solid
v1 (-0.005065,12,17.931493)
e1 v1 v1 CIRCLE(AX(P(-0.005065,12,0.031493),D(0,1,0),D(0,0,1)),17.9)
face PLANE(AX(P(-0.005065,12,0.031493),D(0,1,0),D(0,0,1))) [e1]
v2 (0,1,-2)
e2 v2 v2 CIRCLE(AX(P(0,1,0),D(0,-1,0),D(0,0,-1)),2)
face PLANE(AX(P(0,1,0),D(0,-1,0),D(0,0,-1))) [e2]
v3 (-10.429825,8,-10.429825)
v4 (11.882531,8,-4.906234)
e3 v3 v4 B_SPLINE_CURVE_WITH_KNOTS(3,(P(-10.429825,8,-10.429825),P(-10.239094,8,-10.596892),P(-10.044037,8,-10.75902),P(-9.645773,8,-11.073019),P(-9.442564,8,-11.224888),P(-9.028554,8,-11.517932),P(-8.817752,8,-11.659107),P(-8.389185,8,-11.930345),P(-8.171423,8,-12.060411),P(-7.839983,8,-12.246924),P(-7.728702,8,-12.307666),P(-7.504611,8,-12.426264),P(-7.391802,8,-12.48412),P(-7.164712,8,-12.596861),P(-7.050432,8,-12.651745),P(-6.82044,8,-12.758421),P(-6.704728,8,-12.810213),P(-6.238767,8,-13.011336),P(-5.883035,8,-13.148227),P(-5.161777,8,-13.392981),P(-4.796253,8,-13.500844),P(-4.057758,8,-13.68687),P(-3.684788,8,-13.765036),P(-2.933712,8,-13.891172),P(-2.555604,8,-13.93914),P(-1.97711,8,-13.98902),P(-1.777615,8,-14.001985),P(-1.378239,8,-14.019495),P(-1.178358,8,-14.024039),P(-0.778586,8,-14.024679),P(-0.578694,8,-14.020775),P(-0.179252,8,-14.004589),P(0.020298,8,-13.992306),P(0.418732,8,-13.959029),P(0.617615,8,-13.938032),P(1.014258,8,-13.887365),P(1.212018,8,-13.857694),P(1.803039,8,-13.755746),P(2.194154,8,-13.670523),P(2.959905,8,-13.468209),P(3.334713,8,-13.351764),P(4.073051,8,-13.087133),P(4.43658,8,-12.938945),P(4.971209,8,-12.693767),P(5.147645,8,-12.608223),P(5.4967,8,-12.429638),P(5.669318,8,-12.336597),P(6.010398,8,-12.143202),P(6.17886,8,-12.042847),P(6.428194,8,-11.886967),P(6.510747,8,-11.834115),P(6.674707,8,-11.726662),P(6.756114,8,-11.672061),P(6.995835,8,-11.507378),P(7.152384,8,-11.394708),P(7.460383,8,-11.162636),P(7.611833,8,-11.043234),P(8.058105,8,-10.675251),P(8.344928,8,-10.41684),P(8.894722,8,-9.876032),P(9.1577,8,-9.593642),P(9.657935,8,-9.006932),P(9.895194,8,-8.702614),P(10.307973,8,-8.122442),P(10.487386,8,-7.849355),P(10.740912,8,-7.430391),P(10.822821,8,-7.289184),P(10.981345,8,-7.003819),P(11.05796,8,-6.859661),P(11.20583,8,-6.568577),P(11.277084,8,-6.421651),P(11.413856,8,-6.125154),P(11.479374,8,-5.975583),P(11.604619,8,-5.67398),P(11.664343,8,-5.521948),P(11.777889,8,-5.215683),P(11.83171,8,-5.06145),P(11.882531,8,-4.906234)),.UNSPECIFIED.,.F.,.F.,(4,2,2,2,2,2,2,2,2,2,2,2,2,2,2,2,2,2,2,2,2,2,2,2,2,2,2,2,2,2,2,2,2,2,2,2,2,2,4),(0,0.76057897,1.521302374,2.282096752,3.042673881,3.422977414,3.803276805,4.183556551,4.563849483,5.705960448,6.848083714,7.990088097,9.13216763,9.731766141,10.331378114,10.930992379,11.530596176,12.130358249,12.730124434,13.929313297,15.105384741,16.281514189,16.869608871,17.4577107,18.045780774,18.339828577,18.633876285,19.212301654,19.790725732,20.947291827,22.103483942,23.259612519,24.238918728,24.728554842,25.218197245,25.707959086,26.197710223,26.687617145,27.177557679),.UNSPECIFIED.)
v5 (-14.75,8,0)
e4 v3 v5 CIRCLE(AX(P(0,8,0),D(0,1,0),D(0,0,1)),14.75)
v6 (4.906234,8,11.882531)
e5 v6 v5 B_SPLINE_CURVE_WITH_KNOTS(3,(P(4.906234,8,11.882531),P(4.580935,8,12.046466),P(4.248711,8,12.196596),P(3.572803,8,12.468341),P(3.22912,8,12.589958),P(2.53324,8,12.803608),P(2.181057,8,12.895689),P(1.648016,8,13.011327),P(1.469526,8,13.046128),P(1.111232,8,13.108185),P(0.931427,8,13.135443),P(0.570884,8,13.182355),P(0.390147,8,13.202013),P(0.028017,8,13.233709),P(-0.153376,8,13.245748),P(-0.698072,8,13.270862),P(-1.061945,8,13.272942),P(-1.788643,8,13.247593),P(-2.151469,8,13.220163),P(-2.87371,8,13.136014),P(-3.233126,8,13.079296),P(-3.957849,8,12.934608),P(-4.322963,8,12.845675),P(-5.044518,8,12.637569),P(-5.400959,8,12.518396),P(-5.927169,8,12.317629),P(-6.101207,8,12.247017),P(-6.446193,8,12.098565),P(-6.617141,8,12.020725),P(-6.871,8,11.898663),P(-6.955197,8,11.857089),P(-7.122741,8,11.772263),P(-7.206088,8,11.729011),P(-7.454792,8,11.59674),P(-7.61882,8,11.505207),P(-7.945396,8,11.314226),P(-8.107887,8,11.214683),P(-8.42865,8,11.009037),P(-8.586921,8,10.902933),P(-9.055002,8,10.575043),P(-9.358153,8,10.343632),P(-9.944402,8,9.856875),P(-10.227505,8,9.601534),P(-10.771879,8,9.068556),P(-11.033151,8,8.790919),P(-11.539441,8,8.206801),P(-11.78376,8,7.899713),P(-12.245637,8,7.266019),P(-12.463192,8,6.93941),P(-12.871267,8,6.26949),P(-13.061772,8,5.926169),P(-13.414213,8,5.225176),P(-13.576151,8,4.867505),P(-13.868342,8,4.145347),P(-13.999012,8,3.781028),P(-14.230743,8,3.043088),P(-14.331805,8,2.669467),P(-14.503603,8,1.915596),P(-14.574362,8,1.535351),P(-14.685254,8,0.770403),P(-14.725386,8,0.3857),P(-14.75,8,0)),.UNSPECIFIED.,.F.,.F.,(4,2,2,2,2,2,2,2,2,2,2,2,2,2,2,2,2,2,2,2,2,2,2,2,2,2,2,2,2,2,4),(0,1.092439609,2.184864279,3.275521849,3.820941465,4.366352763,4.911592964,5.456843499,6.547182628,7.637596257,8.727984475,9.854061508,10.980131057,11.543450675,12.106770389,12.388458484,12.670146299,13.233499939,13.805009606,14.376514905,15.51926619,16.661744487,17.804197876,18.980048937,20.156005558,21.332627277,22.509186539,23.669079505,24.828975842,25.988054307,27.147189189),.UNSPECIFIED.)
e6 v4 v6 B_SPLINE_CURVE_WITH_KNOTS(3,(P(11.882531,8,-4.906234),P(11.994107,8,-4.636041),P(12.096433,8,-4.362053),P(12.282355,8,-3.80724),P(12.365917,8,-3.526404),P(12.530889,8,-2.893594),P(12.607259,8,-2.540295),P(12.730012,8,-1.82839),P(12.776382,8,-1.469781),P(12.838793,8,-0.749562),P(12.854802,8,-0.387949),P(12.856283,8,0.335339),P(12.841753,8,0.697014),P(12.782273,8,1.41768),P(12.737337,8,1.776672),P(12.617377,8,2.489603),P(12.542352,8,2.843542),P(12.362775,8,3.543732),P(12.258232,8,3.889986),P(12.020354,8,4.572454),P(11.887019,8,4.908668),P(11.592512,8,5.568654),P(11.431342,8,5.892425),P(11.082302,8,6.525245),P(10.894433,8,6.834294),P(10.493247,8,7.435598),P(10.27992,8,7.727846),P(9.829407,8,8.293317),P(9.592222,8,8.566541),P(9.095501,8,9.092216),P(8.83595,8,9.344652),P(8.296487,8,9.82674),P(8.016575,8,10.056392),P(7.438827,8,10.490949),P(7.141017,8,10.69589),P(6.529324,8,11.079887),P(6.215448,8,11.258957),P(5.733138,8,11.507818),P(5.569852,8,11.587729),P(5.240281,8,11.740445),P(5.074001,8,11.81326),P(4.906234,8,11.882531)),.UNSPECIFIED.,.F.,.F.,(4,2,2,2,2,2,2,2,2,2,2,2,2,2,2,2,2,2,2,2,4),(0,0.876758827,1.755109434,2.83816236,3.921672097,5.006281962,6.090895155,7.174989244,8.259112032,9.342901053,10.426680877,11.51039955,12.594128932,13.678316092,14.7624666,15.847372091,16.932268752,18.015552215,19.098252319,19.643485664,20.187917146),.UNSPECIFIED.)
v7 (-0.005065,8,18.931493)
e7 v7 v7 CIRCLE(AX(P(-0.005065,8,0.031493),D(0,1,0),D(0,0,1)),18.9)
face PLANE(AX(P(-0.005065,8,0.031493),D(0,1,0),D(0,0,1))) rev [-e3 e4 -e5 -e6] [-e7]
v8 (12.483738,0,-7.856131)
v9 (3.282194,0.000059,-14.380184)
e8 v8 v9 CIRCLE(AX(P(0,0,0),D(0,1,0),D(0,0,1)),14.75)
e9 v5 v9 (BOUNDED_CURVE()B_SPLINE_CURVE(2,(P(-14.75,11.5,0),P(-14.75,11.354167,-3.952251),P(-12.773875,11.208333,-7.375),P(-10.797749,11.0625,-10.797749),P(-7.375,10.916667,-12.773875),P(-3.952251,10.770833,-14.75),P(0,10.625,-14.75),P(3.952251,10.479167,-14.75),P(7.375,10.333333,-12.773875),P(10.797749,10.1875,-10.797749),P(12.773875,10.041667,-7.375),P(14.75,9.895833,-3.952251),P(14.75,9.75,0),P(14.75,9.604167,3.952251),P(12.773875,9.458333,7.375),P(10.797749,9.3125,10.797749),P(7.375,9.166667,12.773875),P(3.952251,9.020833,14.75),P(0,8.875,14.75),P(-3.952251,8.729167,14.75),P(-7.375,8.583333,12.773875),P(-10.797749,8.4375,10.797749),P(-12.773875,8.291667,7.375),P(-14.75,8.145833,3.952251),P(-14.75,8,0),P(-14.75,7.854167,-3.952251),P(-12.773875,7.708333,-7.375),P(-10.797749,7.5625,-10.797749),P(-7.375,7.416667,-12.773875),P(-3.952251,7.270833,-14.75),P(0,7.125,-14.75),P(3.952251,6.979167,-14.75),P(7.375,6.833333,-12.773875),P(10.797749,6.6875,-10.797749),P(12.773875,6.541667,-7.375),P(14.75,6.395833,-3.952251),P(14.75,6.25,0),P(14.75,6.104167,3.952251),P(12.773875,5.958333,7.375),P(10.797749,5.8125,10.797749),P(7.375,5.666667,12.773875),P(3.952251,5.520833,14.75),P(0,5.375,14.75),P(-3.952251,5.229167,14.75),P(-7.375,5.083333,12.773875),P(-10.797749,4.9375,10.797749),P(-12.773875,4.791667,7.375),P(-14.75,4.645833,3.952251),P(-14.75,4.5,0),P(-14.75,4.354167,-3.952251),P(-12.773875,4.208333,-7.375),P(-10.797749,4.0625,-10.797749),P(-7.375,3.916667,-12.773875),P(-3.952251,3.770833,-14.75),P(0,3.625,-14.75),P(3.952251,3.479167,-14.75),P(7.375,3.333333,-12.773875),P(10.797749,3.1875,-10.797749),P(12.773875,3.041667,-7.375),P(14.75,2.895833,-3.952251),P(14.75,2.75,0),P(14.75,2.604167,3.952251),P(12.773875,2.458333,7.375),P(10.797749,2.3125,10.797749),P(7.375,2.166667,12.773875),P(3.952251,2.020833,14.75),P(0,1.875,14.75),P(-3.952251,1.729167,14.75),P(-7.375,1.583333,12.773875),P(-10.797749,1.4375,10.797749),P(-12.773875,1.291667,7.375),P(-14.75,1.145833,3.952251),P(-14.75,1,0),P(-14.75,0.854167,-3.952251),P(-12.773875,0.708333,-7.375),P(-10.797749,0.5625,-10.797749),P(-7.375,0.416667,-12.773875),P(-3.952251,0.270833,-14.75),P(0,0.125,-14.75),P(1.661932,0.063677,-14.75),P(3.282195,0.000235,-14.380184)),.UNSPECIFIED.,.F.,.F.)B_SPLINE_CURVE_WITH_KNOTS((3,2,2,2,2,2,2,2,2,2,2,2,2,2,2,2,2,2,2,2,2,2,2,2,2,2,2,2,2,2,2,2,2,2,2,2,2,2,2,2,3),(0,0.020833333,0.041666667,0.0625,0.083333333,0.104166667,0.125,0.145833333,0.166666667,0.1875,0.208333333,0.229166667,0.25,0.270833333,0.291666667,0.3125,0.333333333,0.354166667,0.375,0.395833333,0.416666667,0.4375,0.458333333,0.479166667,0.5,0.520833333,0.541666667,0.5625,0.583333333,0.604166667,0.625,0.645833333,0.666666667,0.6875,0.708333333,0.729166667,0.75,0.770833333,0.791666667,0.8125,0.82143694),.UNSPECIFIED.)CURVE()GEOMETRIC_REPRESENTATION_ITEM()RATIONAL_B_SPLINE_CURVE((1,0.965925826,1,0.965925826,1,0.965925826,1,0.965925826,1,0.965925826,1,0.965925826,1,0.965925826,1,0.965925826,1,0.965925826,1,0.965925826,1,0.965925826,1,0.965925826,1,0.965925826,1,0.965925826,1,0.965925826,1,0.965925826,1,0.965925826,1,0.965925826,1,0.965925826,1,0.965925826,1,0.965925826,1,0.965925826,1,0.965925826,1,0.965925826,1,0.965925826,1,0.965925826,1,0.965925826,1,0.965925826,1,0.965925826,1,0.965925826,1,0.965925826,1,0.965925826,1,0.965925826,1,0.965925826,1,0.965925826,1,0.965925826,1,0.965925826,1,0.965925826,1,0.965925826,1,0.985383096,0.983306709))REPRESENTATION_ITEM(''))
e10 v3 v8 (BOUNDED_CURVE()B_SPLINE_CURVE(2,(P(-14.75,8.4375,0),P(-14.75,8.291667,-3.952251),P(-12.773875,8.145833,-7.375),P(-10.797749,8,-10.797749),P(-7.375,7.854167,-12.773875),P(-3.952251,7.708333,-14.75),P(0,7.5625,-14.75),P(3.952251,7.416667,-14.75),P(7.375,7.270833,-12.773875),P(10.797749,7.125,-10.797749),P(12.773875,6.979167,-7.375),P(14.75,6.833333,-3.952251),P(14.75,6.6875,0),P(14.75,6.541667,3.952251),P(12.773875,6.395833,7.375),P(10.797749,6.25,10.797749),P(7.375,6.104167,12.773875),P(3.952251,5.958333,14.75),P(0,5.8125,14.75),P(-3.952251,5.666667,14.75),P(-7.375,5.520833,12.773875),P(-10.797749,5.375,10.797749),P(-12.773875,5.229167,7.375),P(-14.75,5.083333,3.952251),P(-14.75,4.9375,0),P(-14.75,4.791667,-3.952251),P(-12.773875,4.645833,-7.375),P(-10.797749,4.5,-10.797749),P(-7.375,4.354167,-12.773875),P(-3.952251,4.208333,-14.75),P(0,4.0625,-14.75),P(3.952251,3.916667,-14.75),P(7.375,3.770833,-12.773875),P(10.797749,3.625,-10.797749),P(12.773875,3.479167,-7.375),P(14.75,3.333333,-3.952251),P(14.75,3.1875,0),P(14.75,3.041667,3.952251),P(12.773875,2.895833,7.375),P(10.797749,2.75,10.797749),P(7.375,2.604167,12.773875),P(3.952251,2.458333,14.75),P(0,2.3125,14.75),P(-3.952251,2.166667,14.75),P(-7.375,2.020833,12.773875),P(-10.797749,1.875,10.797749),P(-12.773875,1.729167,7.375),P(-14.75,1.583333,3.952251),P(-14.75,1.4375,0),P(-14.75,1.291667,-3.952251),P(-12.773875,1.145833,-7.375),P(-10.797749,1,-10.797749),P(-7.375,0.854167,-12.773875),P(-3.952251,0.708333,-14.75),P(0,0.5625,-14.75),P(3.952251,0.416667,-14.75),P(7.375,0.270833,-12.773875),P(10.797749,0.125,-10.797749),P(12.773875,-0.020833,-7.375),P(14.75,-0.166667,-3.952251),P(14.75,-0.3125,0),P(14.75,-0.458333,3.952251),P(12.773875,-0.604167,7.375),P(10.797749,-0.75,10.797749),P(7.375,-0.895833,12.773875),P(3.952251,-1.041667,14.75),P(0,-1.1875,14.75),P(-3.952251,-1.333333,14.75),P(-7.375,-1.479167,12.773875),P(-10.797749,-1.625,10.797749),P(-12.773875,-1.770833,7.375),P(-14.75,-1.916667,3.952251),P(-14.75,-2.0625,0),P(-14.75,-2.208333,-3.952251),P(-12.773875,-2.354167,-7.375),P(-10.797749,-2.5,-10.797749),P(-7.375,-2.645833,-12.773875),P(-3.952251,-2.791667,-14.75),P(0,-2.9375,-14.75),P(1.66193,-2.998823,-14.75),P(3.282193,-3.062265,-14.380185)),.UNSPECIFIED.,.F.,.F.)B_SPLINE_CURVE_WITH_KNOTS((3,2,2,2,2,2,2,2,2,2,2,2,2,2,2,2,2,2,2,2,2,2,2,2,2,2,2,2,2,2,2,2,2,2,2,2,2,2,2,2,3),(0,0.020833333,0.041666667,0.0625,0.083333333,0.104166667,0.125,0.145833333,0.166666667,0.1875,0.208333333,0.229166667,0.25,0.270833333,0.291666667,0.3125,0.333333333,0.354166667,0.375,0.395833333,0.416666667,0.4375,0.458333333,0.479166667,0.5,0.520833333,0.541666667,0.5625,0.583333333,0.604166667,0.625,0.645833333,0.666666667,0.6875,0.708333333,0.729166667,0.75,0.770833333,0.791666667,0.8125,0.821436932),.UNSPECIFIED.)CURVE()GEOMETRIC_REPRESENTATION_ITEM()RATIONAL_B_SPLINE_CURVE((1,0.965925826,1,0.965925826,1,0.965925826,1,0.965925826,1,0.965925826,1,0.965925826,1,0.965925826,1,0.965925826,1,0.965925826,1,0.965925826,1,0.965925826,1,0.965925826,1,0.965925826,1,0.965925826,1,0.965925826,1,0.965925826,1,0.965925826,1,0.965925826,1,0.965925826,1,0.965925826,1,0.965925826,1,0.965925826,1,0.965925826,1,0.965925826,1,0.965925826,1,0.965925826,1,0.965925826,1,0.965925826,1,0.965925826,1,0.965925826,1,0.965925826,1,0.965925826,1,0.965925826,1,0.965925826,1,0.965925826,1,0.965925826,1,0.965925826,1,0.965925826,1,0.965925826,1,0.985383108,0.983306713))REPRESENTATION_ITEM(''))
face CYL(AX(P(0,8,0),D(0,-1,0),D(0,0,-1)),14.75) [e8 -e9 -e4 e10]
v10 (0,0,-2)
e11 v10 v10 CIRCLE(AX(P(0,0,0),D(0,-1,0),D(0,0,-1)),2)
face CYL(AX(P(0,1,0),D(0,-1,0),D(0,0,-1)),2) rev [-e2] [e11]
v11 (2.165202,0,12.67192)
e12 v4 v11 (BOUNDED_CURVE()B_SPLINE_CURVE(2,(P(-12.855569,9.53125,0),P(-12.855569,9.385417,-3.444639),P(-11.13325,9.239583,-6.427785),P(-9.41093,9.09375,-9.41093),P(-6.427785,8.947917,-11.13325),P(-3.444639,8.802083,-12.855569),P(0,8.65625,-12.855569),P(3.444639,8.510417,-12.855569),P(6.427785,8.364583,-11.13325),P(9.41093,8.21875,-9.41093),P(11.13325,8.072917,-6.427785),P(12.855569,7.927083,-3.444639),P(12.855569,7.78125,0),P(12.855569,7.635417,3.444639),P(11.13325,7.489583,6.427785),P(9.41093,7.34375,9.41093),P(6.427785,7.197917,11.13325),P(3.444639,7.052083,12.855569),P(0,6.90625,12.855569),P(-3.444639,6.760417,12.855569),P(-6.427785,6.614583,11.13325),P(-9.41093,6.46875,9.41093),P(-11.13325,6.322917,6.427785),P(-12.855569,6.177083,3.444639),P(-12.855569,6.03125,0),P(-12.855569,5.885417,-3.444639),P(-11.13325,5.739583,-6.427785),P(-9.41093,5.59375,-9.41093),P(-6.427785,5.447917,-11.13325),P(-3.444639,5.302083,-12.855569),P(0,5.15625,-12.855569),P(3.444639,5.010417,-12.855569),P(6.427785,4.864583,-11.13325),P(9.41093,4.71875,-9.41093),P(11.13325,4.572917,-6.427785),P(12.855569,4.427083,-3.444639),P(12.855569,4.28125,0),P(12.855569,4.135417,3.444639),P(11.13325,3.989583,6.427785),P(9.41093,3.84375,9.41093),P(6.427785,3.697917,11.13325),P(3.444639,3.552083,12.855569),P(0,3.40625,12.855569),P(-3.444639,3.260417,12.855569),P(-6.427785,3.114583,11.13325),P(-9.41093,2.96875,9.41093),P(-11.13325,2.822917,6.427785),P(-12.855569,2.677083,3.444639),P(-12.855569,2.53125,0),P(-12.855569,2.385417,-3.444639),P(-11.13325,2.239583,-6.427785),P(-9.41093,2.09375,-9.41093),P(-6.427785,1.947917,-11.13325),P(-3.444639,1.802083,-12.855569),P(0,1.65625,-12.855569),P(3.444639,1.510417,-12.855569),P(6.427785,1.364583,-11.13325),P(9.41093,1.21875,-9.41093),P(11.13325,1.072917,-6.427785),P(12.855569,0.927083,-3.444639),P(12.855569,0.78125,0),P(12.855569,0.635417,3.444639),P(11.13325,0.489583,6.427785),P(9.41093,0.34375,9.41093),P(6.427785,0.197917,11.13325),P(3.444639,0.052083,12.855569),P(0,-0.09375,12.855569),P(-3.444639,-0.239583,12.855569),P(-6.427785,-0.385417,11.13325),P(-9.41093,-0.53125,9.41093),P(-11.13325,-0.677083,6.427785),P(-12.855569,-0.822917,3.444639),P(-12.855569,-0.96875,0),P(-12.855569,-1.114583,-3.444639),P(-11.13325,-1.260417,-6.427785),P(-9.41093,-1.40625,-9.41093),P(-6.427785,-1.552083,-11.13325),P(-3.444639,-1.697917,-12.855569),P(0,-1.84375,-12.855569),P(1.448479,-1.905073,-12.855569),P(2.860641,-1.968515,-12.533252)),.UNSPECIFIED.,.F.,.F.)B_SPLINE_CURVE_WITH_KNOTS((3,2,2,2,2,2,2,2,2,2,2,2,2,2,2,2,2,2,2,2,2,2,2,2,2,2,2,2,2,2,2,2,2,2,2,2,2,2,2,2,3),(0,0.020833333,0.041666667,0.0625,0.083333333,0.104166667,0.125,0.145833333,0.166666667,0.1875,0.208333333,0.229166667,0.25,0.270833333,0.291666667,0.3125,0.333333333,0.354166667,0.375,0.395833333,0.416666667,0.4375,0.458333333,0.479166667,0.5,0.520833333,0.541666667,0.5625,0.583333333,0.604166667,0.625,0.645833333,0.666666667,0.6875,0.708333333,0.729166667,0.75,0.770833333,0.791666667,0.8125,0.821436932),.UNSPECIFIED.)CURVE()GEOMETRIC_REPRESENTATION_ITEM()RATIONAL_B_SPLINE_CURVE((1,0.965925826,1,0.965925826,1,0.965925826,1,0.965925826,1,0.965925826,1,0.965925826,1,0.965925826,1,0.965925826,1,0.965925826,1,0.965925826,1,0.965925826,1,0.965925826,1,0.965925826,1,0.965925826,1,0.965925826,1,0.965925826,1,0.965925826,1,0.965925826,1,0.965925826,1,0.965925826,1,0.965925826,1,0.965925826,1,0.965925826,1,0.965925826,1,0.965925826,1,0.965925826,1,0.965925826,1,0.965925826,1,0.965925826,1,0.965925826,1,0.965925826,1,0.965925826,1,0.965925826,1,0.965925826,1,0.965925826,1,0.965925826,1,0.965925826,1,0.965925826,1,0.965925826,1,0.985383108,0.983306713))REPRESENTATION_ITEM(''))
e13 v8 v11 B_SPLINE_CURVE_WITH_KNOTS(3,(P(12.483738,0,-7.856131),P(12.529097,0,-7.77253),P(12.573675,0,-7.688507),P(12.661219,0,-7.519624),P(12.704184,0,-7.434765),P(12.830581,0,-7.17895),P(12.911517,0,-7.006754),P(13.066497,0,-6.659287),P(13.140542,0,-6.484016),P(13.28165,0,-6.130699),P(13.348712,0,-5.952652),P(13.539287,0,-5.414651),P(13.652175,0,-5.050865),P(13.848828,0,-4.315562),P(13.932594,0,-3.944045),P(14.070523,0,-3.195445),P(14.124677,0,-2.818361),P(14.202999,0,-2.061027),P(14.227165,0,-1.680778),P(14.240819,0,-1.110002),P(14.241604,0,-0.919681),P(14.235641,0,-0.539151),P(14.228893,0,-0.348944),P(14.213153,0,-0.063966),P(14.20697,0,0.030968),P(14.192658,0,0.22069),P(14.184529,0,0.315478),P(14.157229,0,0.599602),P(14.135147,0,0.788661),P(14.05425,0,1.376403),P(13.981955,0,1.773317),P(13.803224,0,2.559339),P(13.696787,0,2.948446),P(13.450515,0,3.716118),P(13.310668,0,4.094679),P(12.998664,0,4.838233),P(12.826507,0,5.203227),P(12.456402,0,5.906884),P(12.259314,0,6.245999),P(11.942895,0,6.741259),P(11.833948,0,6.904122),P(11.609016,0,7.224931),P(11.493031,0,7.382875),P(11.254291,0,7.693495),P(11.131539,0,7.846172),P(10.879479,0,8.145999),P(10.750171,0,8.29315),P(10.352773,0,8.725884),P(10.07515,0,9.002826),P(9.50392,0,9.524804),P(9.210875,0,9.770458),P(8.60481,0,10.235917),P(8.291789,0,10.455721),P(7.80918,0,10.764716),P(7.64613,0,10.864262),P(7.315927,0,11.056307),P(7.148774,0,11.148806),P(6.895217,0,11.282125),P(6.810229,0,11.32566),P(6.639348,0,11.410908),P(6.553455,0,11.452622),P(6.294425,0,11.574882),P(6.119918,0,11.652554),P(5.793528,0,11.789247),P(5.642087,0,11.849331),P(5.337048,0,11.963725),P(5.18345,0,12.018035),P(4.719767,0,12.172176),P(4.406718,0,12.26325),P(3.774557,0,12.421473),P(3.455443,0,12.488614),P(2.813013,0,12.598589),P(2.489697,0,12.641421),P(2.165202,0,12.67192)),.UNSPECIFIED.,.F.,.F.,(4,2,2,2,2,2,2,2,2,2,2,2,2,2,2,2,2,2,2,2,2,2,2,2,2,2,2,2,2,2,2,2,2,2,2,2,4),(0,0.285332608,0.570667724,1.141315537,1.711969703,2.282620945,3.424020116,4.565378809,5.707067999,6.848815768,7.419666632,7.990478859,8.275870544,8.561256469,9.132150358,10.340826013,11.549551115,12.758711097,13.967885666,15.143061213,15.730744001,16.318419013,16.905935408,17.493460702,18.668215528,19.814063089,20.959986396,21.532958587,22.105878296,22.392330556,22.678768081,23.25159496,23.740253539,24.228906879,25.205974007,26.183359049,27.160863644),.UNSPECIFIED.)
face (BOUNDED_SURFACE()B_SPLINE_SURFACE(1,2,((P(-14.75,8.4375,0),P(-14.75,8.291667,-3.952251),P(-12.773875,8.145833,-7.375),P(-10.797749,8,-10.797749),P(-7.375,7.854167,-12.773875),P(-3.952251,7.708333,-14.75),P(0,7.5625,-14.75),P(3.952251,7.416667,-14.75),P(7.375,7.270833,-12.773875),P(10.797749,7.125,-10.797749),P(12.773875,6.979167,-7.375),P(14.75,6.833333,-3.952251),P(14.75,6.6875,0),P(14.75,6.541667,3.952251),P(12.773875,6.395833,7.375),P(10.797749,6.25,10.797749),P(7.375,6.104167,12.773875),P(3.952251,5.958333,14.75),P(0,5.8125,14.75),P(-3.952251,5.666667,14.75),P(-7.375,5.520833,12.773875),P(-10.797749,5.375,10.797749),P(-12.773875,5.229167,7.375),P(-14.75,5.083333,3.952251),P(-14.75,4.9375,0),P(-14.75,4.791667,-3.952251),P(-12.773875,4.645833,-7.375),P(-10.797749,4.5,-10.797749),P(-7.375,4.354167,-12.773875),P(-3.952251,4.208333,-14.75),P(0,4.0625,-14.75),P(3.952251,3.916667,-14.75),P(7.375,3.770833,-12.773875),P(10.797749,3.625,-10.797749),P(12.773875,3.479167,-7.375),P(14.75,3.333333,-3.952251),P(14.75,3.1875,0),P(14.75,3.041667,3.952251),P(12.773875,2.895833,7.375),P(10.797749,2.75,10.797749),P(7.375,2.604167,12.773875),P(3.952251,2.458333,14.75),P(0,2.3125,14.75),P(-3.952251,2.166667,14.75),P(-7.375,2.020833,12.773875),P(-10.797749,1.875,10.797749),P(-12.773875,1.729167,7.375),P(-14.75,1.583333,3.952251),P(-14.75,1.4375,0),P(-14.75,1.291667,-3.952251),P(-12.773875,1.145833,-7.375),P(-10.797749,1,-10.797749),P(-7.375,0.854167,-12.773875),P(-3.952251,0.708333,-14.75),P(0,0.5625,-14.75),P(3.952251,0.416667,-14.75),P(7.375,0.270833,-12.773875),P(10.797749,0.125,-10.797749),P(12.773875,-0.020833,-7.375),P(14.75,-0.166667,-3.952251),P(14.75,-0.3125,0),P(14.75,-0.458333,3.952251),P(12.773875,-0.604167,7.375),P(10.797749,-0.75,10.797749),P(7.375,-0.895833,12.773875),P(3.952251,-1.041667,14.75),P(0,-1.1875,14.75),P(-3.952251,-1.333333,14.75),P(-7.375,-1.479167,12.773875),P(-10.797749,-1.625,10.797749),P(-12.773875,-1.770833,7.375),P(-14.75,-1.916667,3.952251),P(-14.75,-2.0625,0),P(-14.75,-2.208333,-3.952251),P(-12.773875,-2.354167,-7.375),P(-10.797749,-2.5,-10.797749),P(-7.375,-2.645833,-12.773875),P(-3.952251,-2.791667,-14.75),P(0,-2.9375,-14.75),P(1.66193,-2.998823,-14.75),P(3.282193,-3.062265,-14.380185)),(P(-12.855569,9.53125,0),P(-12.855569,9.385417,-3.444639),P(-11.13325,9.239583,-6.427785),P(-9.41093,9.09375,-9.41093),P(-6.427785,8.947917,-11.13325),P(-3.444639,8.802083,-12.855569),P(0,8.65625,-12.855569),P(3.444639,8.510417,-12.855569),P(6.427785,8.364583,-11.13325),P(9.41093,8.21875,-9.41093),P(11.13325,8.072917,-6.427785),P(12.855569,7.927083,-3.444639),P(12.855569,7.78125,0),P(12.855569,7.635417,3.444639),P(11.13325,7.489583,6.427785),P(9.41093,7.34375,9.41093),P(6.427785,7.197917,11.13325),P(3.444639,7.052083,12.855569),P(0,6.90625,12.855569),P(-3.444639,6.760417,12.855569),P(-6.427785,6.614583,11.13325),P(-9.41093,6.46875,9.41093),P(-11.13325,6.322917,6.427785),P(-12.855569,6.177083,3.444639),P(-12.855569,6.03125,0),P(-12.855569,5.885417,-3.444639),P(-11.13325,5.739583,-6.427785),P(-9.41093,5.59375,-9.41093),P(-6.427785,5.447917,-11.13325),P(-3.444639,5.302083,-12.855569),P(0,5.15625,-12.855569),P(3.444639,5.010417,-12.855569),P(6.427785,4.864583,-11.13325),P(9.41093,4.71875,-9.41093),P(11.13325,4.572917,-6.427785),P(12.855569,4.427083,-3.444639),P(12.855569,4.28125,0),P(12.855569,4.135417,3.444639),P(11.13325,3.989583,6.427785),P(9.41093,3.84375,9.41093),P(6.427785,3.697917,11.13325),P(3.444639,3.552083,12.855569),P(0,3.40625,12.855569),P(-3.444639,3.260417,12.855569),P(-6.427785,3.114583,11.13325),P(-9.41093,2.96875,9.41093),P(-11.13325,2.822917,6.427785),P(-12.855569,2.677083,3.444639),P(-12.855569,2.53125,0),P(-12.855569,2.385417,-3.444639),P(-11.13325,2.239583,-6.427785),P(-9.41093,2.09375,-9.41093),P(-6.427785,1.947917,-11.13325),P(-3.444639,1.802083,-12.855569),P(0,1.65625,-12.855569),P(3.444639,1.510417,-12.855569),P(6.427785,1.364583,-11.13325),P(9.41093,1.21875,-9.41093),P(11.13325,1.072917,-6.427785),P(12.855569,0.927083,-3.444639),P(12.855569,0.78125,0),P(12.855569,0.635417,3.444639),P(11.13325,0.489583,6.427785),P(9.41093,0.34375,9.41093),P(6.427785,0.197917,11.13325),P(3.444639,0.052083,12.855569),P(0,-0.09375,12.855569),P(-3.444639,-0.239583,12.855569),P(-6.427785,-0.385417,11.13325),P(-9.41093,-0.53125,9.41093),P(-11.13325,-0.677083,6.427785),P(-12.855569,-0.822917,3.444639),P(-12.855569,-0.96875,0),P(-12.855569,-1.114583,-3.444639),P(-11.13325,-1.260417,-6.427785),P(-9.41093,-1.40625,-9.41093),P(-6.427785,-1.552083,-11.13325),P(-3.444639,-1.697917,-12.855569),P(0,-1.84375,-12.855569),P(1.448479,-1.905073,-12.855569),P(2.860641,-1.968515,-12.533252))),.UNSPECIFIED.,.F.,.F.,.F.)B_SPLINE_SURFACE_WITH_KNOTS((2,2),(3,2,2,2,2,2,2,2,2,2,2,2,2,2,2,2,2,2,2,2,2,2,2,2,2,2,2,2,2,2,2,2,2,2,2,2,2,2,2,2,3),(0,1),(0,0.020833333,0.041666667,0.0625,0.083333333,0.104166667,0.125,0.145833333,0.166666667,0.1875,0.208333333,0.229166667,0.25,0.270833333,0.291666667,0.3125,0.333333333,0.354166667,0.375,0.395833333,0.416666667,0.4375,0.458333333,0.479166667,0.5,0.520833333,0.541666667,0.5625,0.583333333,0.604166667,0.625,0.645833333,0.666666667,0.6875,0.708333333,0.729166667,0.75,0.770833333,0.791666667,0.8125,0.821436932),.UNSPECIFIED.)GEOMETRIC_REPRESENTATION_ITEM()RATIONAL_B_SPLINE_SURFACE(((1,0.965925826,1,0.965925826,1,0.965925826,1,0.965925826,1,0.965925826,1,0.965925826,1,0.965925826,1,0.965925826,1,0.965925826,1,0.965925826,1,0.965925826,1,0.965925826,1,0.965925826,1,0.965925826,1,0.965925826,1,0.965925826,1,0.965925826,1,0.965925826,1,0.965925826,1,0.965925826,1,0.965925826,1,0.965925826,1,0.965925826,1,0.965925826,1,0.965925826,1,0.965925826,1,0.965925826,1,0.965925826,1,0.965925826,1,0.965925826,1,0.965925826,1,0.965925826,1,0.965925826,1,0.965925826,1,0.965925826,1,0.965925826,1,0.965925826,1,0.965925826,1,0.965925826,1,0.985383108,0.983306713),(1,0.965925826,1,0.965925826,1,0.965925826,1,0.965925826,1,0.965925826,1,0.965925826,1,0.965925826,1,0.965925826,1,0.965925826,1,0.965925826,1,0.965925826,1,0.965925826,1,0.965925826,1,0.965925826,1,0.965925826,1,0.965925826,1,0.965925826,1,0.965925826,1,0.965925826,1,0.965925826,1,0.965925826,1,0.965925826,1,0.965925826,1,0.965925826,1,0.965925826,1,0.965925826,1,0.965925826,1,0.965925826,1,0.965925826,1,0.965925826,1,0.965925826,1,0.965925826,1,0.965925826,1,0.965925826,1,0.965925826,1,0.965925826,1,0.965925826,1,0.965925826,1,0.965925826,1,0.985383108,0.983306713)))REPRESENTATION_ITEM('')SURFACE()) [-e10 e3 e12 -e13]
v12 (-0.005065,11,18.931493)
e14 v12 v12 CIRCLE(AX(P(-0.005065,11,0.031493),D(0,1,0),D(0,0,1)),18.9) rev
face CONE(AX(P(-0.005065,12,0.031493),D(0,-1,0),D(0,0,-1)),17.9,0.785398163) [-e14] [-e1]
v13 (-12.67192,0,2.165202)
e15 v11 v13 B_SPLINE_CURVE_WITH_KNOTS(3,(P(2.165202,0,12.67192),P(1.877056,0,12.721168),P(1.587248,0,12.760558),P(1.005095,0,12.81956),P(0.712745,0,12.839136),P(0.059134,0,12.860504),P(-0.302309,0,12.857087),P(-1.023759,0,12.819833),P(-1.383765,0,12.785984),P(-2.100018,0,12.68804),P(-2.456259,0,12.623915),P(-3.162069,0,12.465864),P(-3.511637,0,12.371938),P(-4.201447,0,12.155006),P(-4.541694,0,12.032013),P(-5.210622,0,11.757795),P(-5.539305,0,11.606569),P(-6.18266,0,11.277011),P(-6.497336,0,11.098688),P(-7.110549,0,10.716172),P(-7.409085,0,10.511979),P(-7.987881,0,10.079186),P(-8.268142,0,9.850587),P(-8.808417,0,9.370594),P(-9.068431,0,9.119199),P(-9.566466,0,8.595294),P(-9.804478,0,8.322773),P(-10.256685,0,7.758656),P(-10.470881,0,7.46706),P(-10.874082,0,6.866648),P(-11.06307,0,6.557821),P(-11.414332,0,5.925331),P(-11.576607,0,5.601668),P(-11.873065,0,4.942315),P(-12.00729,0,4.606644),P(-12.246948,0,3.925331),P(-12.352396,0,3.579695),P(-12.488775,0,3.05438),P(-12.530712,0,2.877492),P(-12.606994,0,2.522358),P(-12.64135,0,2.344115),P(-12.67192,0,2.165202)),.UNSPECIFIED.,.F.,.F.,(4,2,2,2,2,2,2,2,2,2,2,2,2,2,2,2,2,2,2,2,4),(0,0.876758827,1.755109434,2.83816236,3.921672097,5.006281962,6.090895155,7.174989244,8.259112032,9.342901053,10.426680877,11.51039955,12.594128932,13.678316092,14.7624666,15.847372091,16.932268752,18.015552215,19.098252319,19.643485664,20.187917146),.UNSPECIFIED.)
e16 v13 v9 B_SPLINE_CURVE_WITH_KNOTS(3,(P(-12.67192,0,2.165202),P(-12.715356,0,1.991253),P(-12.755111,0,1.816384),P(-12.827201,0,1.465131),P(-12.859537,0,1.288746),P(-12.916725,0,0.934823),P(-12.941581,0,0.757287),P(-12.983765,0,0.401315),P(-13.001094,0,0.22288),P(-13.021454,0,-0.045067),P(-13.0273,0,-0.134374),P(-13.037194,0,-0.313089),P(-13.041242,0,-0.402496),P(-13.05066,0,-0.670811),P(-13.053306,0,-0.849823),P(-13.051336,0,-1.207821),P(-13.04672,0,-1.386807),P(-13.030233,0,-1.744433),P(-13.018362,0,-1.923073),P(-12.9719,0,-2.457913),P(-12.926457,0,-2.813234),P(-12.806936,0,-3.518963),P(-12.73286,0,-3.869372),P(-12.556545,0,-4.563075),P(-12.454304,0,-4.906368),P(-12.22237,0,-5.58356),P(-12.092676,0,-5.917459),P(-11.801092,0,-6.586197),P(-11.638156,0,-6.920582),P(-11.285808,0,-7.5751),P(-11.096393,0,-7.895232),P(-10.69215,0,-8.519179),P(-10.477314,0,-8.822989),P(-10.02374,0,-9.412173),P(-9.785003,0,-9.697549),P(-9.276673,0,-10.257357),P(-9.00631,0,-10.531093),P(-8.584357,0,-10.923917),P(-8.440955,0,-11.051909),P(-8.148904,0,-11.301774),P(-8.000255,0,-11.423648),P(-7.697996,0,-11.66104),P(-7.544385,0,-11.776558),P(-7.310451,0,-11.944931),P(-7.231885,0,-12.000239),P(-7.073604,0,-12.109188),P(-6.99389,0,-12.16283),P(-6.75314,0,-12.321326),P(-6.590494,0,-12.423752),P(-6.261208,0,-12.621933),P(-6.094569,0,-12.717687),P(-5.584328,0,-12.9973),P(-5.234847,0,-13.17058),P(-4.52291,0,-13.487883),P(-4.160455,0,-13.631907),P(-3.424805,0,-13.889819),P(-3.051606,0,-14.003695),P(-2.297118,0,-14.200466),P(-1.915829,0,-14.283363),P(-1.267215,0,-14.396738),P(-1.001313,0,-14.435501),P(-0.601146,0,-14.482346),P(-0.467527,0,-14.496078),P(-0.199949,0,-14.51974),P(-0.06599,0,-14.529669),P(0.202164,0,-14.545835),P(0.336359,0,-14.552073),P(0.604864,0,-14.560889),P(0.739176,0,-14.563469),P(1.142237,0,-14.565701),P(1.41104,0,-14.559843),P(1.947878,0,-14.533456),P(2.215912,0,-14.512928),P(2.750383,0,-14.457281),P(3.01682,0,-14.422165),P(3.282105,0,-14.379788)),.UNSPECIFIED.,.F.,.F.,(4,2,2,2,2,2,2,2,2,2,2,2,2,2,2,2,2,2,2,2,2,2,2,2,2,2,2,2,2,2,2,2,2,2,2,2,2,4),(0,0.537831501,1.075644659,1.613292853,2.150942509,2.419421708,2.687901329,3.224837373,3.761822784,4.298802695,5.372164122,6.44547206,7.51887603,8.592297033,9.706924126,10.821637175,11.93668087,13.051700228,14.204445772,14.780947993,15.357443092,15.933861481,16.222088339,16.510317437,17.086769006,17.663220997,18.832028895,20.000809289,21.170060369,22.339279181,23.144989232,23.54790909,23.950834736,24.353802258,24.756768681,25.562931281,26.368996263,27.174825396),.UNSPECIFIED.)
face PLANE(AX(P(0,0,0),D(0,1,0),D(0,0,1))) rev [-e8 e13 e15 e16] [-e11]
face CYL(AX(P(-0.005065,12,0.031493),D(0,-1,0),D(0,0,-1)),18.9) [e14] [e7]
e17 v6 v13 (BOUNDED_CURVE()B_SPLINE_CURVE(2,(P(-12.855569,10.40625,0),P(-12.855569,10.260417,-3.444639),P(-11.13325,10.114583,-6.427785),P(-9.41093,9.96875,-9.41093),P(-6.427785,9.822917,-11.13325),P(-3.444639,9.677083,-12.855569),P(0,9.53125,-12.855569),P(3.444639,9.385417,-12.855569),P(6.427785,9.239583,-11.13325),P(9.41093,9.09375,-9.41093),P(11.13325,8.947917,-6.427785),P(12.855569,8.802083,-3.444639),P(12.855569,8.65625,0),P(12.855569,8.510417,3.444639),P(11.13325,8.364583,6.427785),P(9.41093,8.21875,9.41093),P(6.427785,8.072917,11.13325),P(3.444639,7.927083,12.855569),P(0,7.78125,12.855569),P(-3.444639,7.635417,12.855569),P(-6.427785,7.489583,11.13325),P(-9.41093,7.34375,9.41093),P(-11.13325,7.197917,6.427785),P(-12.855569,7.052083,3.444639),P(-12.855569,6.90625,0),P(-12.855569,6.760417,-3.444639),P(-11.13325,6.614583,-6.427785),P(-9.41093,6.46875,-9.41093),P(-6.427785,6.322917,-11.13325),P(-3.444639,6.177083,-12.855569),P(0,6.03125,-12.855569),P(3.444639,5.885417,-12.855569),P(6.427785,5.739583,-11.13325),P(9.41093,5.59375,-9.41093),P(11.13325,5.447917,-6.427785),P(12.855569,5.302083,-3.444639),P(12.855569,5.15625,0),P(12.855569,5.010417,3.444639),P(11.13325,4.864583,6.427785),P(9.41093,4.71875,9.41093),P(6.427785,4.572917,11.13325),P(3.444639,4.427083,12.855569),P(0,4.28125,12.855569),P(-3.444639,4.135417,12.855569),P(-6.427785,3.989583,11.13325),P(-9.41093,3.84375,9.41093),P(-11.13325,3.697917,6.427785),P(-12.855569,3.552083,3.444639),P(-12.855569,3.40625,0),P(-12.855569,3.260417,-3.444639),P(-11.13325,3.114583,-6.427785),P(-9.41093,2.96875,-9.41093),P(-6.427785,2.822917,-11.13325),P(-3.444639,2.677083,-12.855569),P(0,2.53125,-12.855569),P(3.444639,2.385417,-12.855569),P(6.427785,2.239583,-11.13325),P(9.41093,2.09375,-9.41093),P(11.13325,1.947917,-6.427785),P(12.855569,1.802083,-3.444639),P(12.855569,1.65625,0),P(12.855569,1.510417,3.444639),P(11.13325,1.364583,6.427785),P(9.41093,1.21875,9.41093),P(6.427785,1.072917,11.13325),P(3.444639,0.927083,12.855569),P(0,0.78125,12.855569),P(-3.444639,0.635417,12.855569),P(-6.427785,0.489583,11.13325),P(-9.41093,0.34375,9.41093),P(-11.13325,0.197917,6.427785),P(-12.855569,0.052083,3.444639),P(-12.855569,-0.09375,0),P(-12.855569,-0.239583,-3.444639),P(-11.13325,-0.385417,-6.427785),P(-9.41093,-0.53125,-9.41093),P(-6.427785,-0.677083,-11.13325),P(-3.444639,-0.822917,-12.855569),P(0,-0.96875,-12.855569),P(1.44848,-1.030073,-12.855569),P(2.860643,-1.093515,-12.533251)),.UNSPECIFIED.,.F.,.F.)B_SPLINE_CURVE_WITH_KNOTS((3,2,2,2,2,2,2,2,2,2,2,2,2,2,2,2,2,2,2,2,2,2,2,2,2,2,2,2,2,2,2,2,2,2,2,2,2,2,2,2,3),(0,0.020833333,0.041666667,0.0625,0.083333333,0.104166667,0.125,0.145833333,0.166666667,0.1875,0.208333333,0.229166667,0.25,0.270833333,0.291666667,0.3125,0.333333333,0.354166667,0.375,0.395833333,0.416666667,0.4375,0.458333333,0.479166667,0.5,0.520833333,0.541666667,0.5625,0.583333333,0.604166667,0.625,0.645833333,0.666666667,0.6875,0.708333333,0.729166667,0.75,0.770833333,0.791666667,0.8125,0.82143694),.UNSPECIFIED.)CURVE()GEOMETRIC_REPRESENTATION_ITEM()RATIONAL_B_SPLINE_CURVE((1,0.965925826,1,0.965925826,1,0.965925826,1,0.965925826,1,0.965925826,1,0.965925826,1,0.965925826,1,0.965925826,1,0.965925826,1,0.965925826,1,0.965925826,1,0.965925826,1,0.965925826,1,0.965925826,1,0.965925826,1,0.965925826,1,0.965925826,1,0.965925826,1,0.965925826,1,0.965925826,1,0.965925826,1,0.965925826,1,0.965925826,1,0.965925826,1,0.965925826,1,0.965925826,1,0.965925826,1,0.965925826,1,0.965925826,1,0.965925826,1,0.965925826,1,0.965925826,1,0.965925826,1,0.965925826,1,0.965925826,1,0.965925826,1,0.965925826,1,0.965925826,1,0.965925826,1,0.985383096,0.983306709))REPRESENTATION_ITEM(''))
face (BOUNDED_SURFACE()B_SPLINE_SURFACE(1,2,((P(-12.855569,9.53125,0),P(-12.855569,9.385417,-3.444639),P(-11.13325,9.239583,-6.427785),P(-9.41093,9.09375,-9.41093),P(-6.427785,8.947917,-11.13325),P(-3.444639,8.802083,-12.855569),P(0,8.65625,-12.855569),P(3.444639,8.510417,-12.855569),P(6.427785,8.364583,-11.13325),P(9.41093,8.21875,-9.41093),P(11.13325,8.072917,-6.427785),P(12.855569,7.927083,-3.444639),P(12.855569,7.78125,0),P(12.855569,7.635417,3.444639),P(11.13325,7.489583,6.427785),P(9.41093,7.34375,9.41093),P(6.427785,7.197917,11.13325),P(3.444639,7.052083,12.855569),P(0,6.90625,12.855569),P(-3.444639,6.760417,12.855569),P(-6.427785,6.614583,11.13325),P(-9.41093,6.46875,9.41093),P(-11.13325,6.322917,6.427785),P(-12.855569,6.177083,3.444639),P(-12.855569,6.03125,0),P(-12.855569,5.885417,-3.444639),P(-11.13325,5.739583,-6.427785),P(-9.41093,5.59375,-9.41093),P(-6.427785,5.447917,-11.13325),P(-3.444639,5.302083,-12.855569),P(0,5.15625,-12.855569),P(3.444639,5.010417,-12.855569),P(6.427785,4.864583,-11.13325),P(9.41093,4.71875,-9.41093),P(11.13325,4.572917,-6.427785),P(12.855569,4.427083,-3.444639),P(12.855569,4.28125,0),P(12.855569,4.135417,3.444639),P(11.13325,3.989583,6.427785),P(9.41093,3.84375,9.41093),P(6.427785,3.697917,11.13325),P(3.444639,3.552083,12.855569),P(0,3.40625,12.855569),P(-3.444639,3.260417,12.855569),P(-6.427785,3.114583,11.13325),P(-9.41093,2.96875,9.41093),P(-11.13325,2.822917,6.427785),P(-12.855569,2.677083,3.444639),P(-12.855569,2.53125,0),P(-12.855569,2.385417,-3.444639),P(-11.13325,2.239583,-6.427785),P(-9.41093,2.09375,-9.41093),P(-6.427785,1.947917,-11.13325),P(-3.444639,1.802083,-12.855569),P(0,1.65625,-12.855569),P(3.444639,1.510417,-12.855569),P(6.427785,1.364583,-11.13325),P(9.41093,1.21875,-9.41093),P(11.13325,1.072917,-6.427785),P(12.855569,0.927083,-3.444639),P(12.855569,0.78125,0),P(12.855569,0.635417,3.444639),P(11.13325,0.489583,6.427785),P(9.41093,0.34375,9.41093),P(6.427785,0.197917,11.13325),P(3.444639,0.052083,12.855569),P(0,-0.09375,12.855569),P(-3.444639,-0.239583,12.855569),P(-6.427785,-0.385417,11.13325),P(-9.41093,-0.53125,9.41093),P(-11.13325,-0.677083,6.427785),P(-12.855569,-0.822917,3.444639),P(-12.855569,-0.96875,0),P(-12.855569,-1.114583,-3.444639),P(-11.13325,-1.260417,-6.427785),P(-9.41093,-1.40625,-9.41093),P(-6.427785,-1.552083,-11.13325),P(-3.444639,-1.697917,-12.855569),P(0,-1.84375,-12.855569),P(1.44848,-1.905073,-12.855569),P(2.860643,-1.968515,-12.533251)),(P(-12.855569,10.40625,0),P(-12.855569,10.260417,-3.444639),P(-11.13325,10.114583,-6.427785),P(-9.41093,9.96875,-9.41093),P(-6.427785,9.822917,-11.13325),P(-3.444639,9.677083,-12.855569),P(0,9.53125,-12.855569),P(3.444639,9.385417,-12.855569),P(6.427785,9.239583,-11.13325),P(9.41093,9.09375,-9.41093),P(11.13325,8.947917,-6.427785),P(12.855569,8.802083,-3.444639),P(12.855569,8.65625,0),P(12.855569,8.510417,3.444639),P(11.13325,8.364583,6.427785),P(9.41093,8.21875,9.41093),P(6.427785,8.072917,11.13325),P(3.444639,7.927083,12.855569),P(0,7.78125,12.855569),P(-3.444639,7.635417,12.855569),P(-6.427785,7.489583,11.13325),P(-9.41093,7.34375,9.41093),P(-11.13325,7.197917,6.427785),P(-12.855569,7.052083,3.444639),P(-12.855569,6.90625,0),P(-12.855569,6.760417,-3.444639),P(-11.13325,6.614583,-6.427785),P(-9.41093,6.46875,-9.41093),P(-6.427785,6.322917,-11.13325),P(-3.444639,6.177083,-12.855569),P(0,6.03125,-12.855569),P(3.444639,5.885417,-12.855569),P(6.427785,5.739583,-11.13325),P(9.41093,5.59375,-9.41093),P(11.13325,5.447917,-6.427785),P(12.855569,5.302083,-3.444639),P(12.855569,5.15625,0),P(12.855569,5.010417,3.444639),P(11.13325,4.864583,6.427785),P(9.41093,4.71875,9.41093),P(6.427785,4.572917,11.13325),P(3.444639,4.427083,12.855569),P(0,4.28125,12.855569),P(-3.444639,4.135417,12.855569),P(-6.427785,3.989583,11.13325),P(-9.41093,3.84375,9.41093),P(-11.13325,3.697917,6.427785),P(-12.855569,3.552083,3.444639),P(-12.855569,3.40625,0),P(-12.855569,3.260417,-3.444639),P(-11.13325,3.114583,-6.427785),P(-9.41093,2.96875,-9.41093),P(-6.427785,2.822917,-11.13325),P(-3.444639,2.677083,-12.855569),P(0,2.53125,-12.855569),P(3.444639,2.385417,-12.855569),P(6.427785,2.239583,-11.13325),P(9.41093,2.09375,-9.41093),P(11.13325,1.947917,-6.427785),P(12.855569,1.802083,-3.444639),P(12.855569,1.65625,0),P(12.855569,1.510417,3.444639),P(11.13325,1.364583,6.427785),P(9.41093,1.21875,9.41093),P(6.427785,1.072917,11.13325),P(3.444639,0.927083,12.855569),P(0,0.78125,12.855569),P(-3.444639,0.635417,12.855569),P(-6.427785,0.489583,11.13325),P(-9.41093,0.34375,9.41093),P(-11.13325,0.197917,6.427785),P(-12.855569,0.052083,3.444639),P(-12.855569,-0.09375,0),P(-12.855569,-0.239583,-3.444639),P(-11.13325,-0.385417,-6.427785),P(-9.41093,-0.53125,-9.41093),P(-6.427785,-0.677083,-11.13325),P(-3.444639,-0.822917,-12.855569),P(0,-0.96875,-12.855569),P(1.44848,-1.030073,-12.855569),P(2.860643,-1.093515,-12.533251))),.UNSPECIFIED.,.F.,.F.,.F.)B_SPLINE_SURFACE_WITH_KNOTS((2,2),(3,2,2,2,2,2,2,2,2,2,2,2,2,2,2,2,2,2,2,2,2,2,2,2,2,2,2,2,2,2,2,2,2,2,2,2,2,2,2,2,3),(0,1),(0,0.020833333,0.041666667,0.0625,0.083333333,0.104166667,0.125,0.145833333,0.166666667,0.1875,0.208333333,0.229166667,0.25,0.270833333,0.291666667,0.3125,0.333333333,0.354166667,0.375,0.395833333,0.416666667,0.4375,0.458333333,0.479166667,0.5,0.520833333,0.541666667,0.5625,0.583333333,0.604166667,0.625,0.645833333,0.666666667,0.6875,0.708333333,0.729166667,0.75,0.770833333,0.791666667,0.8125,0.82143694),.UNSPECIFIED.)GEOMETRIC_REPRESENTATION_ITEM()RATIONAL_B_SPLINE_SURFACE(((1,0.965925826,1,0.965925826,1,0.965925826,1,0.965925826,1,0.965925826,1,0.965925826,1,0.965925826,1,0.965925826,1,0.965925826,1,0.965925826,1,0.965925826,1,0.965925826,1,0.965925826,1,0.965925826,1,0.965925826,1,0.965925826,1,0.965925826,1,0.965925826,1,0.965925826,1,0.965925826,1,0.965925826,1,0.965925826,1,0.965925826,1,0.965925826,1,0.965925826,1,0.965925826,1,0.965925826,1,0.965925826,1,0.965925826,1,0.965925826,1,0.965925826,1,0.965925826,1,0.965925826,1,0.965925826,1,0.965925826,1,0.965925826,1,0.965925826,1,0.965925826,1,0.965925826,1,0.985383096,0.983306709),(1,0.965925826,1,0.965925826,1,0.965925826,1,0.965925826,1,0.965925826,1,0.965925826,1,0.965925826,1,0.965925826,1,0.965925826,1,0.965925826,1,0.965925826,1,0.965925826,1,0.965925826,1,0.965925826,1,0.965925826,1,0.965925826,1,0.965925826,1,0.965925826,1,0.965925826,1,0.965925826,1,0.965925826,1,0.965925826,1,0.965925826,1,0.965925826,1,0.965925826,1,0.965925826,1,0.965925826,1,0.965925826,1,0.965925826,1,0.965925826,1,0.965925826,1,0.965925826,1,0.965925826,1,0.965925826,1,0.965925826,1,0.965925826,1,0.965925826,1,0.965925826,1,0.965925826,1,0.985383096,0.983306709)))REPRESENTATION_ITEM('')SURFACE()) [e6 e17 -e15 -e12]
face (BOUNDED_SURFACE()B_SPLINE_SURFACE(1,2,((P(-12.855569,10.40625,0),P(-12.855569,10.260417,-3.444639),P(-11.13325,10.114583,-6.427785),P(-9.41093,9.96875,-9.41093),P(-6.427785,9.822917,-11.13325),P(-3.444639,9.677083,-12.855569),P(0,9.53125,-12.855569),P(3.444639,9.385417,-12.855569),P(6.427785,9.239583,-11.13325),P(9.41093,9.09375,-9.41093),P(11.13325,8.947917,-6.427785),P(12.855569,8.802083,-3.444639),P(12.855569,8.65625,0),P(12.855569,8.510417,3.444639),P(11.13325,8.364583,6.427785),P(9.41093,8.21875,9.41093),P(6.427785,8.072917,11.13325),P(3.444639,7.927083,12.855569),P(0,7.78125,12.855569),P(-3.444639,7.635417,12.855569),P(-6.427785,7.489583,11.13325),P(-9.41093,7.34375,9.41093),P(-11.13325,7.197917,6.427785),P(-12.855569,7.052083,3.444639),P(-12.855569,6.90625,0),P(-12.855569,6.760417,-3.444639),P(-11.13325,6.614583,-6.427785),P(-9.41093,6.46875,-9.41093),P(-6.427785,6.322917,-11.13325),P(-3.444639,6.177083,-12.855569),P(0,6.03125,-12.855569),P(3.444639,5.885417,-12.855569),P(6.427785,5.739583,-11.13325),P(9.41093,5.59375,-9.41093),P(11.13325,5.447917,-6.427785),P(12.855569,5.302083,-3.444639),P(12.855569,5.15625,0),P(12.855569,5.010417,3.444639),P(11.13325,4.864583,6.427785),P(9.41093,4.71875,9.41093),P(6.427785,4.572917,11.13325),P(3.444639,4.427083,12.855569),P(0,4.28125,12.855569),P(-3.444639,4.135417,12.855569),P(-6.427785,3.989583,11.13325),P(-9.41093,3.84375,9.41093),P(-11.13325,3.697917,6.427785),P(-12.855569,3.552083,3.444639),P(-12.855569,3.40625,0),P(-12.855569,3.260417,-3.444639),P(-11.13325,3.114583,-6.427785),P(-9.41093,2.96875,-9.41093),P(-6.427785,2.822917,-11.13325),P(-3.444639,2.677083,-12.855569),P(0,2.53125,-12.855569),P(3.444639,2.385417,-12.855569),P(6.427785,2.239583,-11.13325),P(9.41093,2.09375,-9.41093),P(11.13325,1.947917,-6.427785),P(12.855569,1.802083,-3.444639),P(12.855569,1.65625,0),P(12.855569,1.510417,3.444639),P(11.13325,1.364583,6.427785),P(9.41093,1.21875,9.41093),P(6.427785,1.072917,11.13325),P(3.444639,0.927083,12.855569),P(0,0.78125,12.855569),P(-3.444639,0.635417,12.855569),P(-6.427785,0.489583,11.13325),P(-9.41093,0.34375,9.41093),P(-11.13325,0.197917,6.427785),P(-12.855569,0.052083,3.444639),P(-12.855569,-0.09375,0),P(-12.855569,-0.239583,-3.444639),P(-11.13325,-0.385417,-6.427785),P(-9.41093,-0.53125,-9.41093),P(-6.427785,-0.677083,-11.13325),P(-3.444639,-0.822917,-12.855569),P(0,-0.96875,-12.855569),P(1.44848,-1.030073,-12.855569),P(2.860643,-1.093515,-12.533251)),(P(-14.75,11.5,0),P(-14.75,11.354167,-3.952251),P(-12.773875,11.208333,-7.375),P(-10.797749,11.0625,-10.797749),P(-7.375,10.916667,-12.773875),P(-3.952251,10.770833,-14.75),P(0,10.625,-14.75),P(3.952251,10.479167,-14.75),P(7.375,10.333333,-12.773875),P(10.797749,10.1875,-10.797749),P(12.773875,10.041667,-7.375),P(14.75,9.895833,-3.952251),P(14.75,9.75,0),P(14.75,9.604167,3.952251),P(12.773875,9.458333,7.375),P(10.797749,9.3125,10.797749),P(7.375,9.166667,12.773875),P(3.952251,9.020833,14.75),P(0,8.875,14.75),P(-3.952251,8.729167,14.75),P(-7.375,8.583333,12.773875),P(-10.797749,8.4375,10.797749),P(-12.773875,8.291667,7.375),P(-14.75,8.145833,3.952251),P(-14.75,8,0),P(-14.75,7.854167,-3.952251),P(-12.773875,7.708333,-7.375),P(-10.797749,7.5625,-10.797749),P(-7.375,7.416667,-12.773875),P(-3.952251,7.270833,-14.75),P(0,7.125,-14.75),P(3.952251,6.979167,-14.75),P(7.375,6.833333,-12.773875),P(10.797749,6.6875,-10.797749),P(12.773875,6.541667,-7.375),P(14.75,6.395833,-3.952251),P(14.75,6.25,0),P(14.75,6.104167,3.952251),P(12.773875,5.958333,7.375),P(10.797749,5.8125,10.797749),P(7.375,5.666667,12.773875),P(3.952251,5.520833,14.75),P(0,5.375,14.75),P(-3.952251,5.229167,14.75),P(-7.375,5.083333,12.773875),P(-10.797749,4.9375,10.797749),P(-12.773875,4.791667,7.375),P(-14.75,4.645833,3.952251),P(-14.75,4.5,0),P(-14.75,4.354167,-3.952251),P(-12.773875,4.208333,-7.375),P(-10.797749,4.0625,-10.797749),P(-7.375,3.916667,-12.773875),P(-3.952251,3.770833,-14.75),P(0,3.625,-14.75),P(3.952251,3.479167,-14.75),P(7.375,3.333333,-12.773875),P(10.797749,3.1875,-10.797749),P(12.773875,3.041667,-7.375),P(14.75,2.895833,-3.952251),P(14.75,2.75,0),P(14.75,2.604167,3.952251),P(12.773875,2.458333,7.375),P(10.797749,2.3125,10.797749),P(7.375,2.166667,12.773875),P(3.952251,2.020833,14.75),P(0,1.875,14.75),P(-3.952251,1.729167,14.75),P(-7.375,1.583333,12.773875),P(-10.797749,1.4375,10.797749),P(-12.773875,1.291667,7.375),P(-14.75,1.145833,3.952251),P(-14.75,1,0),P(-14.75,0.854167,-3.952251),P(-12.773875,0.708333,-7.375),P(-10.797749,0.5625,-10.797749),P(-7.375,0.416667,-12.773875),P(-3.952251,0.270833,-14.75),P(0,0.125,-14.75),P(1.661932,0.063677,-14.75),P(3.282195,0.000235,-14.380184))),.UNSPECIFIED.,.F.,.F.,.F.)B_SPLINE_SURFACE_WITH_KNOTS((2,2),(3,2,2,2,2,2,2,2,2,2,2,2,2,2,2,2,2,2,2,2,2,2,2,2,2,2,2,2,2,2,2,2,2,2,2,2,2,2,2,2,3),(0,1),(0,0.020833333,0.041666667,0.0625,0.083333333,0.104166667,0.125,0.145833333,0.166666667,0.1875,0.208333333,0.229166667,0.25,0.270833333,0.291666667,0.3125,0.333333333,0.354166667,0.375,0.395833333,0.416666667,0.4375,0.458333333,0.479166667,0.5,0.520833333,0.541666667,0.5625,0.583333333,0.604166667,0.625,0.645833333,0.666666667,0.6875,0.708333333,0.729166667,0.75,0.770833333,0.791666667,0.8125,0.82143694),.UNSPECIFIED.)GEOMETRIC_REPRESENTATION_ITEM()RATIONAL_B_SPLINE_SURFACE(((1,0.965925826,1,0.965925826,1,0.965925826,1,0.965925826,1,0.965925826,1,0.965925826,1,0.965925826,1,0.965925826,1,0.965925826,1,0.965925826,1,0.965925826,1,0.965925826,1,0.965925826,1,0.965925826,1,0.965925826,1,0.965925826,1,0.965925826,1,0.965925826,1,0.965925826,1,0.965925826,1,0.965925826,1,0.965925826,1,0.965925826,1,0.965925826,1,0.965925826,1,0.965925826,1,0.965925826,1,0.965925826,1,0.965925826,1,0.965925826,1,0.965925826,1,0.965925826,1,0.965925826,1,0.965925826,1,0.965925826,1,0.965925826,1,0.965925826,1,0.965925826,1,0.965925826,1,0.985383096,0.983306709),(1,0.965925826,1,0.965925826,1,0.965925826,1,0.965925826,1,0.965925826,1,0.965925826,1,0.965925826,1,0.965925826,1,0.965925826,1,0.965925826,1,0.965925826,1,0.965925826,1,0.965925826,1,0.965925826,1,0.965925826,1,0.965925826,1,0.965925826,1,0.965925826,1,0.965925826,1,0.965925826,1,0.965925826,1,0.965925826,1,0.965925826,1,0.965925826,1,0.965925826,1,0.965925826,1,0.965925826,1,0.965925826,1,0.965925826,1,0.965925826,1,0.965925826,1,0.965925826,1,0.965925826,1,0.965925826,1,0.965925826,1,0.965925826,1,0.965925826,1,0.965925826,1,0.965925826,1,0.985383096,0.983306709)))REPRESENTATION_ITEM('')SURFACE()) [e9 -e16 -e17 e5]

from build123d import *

# Parameters (mm, degrees)
SKETCH1_R           = 14.75
BOSS_EXTRUDE1_DEPTH = 8
SKETCH2_R           = 18.9
BOSS_EXTRUDE2_DEPTH = 4
THREAD1_PITCH       = 3.5
THREAD1_FROM        = 3.5
CHAMFER2_SIZE       = 1
SKETCH3_R           = 2
CUT_EXTRUDE1_DEPTH  = 1


with BuildPart() as part:
    # Sketch1 → Boss-Extrude1 (new body)
    with BuildSketch(Plane(origin=(0, 0, 0), x_dir=(1, 0, 0), z_dir=(0, 1, 0))):
        with Locations(Location((0, 0, 0), (0, 0, 270))):
            Circle(SKETCH1_R)
    extrude(amount=BOSS_EXTRUDE1_DEPTH)

    # Sketch2 → Boss-Extrude2 (add)
    with BuildSketch(Plane(origin=(0, 8, 0), x_dir=(1, 0, 0), z_dir=(0, 1, 0))):
        with Locations(Location((-0.005064595, -0.031492848, 0), (0, 0, 270))):
            Circle(SKETCH2_R)
    extrude(amount=BOSS_EXTRUDE2_DEPTH)

    # Thread1: arcs per turn and ends read off the stored shape
    # Thread1: the profile of Thread Profile1 profile screwed along a right-hand helix through 3.285714 turns, 12 arcs to a turn; built about Z, then put on its axis
    thread1_z = Axis((0, 0, 0), (0, 0, 1))
    thread1_corners = [(14.7503, 0, -0.000173205), (14.7503, 0, 3.062673196), (12.855569438, 0, 1.968749995), (12.855569438, 0, 1.093749995)]
    with BuildLine(mode=Mode.PRIVATE) as thread1_profile:
        Line(thread1_corners[0], thread1_corners[1])
        Line(thread1_corners[1], thread1_corners[2])
        Line(thread1_corners[2], thread1_corners[3])
        Line(thread1_corners[3], thread1_corners[0])
    thread1_cap = Face(thread1_profile.wire())
    thread1_turn_angles = [0, 15, 30, 45, 60, 75, 90, 105, 120, 135, 150, 165, 180, 195, 210, 225, 240, 255, 270, 285, 300, 315, 330, 345, 360]
    thread1_turn_weights = [1, 0.9659258262890683, 1, 0.9659258262890683, 1, 0.9659258262890683, 1, 0.9659258262890683, 1, 0.9659258262890683, 1, 0.9659258262890683, 1, 0.9659258262890683, 1, 0.9659258262890683, 1, 0.9659258262890683, 1, 0.9659258262890683, 1, 0.9659258262890683, 1, 0.9659258262890683, 1]
    thread1_turn_rails = [Edge.make_bspline([Vector(p[0], p[1], 0).rotate(thread1_z, thread1_turn_angles[k]) / thread1_turn_weights[k] + Vector(0, 0, p[2] + THREAD1_PITCH * thread1_turn_angles[k] / 360) for k in range(25)], [0, 0, 0, 1, 1, 2, 2, 3, 3, 4, 4, 5, 5, 6, 6, 7, 7, 8, 8, 9, 9, 10, 10, 11, 11, 12, 12, 12], 2, thread1_turn_weights) for p in thread1_corners]
    thread1_turn_sides = [Face.make_surface_from_curves(thread1_turn_rails[p[0]], thread1_turn_rails[p[1]]) for p in [(0, 1), (1, 2), (2, 3), (3, 0)]]
    thread1_last_angles = [1080, 1095, 1110, 1125, 1140, 1155, 1170, 1176.428571429, 1182.857142857]
    thread1_last_weights = [1, 0.9659258262890683, 1, 0.9659258262890683, 1, 0.9659258262890683, 1, 0.9937122098932428, 1]
    thread1_last_rails = [Edge.make_bspline([Vector(p[0], p[1], 0).rotate(thread1_z, thread1_last_angles[k]) / thread1_last_weights[k] + Vector(0, 0, p[2] + THREAD1_PITCH * thread1_last_angles[k] / 360) for k in range(9)], [0, 0, 0, 1, 1, 2, 2, 3, 3, 4, 4, 4], 2, thread1_last_weights) for p in thread1_corners]
    thread1_last_sides = [Face.make_surface_from_curves(thread1_last_rails[p[0]], thread1_last_rails[p[1]]) for p in [(0, 1), (1, 2), (2, 3), (3, 0)]]
    thread1 = Plane(origin=(0, 11.5, 0), x_dir=(-1, 0, 0), z_dir=(0, -1, 0)) * split(Solid(Shell([*[p.moved(Location((0, 0, THREAD1_PITCH * i))) for i in range(3) for p in thread1_turn_sides], *thread1_last_sides, thread1_cap, thread1_cap.rotate(thread1_z, 1182.857142857).moved(Location((0, 0, THREAD1_PITCH * 1182.857142857 / 360)))])), bisect_by=Plane.XY.offset(THREAD1_FROM), keep=Keep.TOP, mode=Mode.PRIVATE)
    add(thread1, mode=Mode.SUBTRACT)

    # Chamfer2
    chamfer2_edges = [part.edges().sort_by_distance(p)[0] for p in [
        (-0.005064595, 12, -18.868507152),
    ]]
    chamfer(chamfer2_edges, length=CHAMFER2_SIZE)

    # Sketch3 → Cut-Extrude1 (cut)
    with BuildSketch(Plane.XZ):
        with Locations(Location((0, 0, 0), (0, 0, 270))):
            Circle(SKETCH3_R)
    extrude(amount=-CUT_EXTRUDE1_DEPTH, mode=Mode.SUBTRACT)


solid = part.part
